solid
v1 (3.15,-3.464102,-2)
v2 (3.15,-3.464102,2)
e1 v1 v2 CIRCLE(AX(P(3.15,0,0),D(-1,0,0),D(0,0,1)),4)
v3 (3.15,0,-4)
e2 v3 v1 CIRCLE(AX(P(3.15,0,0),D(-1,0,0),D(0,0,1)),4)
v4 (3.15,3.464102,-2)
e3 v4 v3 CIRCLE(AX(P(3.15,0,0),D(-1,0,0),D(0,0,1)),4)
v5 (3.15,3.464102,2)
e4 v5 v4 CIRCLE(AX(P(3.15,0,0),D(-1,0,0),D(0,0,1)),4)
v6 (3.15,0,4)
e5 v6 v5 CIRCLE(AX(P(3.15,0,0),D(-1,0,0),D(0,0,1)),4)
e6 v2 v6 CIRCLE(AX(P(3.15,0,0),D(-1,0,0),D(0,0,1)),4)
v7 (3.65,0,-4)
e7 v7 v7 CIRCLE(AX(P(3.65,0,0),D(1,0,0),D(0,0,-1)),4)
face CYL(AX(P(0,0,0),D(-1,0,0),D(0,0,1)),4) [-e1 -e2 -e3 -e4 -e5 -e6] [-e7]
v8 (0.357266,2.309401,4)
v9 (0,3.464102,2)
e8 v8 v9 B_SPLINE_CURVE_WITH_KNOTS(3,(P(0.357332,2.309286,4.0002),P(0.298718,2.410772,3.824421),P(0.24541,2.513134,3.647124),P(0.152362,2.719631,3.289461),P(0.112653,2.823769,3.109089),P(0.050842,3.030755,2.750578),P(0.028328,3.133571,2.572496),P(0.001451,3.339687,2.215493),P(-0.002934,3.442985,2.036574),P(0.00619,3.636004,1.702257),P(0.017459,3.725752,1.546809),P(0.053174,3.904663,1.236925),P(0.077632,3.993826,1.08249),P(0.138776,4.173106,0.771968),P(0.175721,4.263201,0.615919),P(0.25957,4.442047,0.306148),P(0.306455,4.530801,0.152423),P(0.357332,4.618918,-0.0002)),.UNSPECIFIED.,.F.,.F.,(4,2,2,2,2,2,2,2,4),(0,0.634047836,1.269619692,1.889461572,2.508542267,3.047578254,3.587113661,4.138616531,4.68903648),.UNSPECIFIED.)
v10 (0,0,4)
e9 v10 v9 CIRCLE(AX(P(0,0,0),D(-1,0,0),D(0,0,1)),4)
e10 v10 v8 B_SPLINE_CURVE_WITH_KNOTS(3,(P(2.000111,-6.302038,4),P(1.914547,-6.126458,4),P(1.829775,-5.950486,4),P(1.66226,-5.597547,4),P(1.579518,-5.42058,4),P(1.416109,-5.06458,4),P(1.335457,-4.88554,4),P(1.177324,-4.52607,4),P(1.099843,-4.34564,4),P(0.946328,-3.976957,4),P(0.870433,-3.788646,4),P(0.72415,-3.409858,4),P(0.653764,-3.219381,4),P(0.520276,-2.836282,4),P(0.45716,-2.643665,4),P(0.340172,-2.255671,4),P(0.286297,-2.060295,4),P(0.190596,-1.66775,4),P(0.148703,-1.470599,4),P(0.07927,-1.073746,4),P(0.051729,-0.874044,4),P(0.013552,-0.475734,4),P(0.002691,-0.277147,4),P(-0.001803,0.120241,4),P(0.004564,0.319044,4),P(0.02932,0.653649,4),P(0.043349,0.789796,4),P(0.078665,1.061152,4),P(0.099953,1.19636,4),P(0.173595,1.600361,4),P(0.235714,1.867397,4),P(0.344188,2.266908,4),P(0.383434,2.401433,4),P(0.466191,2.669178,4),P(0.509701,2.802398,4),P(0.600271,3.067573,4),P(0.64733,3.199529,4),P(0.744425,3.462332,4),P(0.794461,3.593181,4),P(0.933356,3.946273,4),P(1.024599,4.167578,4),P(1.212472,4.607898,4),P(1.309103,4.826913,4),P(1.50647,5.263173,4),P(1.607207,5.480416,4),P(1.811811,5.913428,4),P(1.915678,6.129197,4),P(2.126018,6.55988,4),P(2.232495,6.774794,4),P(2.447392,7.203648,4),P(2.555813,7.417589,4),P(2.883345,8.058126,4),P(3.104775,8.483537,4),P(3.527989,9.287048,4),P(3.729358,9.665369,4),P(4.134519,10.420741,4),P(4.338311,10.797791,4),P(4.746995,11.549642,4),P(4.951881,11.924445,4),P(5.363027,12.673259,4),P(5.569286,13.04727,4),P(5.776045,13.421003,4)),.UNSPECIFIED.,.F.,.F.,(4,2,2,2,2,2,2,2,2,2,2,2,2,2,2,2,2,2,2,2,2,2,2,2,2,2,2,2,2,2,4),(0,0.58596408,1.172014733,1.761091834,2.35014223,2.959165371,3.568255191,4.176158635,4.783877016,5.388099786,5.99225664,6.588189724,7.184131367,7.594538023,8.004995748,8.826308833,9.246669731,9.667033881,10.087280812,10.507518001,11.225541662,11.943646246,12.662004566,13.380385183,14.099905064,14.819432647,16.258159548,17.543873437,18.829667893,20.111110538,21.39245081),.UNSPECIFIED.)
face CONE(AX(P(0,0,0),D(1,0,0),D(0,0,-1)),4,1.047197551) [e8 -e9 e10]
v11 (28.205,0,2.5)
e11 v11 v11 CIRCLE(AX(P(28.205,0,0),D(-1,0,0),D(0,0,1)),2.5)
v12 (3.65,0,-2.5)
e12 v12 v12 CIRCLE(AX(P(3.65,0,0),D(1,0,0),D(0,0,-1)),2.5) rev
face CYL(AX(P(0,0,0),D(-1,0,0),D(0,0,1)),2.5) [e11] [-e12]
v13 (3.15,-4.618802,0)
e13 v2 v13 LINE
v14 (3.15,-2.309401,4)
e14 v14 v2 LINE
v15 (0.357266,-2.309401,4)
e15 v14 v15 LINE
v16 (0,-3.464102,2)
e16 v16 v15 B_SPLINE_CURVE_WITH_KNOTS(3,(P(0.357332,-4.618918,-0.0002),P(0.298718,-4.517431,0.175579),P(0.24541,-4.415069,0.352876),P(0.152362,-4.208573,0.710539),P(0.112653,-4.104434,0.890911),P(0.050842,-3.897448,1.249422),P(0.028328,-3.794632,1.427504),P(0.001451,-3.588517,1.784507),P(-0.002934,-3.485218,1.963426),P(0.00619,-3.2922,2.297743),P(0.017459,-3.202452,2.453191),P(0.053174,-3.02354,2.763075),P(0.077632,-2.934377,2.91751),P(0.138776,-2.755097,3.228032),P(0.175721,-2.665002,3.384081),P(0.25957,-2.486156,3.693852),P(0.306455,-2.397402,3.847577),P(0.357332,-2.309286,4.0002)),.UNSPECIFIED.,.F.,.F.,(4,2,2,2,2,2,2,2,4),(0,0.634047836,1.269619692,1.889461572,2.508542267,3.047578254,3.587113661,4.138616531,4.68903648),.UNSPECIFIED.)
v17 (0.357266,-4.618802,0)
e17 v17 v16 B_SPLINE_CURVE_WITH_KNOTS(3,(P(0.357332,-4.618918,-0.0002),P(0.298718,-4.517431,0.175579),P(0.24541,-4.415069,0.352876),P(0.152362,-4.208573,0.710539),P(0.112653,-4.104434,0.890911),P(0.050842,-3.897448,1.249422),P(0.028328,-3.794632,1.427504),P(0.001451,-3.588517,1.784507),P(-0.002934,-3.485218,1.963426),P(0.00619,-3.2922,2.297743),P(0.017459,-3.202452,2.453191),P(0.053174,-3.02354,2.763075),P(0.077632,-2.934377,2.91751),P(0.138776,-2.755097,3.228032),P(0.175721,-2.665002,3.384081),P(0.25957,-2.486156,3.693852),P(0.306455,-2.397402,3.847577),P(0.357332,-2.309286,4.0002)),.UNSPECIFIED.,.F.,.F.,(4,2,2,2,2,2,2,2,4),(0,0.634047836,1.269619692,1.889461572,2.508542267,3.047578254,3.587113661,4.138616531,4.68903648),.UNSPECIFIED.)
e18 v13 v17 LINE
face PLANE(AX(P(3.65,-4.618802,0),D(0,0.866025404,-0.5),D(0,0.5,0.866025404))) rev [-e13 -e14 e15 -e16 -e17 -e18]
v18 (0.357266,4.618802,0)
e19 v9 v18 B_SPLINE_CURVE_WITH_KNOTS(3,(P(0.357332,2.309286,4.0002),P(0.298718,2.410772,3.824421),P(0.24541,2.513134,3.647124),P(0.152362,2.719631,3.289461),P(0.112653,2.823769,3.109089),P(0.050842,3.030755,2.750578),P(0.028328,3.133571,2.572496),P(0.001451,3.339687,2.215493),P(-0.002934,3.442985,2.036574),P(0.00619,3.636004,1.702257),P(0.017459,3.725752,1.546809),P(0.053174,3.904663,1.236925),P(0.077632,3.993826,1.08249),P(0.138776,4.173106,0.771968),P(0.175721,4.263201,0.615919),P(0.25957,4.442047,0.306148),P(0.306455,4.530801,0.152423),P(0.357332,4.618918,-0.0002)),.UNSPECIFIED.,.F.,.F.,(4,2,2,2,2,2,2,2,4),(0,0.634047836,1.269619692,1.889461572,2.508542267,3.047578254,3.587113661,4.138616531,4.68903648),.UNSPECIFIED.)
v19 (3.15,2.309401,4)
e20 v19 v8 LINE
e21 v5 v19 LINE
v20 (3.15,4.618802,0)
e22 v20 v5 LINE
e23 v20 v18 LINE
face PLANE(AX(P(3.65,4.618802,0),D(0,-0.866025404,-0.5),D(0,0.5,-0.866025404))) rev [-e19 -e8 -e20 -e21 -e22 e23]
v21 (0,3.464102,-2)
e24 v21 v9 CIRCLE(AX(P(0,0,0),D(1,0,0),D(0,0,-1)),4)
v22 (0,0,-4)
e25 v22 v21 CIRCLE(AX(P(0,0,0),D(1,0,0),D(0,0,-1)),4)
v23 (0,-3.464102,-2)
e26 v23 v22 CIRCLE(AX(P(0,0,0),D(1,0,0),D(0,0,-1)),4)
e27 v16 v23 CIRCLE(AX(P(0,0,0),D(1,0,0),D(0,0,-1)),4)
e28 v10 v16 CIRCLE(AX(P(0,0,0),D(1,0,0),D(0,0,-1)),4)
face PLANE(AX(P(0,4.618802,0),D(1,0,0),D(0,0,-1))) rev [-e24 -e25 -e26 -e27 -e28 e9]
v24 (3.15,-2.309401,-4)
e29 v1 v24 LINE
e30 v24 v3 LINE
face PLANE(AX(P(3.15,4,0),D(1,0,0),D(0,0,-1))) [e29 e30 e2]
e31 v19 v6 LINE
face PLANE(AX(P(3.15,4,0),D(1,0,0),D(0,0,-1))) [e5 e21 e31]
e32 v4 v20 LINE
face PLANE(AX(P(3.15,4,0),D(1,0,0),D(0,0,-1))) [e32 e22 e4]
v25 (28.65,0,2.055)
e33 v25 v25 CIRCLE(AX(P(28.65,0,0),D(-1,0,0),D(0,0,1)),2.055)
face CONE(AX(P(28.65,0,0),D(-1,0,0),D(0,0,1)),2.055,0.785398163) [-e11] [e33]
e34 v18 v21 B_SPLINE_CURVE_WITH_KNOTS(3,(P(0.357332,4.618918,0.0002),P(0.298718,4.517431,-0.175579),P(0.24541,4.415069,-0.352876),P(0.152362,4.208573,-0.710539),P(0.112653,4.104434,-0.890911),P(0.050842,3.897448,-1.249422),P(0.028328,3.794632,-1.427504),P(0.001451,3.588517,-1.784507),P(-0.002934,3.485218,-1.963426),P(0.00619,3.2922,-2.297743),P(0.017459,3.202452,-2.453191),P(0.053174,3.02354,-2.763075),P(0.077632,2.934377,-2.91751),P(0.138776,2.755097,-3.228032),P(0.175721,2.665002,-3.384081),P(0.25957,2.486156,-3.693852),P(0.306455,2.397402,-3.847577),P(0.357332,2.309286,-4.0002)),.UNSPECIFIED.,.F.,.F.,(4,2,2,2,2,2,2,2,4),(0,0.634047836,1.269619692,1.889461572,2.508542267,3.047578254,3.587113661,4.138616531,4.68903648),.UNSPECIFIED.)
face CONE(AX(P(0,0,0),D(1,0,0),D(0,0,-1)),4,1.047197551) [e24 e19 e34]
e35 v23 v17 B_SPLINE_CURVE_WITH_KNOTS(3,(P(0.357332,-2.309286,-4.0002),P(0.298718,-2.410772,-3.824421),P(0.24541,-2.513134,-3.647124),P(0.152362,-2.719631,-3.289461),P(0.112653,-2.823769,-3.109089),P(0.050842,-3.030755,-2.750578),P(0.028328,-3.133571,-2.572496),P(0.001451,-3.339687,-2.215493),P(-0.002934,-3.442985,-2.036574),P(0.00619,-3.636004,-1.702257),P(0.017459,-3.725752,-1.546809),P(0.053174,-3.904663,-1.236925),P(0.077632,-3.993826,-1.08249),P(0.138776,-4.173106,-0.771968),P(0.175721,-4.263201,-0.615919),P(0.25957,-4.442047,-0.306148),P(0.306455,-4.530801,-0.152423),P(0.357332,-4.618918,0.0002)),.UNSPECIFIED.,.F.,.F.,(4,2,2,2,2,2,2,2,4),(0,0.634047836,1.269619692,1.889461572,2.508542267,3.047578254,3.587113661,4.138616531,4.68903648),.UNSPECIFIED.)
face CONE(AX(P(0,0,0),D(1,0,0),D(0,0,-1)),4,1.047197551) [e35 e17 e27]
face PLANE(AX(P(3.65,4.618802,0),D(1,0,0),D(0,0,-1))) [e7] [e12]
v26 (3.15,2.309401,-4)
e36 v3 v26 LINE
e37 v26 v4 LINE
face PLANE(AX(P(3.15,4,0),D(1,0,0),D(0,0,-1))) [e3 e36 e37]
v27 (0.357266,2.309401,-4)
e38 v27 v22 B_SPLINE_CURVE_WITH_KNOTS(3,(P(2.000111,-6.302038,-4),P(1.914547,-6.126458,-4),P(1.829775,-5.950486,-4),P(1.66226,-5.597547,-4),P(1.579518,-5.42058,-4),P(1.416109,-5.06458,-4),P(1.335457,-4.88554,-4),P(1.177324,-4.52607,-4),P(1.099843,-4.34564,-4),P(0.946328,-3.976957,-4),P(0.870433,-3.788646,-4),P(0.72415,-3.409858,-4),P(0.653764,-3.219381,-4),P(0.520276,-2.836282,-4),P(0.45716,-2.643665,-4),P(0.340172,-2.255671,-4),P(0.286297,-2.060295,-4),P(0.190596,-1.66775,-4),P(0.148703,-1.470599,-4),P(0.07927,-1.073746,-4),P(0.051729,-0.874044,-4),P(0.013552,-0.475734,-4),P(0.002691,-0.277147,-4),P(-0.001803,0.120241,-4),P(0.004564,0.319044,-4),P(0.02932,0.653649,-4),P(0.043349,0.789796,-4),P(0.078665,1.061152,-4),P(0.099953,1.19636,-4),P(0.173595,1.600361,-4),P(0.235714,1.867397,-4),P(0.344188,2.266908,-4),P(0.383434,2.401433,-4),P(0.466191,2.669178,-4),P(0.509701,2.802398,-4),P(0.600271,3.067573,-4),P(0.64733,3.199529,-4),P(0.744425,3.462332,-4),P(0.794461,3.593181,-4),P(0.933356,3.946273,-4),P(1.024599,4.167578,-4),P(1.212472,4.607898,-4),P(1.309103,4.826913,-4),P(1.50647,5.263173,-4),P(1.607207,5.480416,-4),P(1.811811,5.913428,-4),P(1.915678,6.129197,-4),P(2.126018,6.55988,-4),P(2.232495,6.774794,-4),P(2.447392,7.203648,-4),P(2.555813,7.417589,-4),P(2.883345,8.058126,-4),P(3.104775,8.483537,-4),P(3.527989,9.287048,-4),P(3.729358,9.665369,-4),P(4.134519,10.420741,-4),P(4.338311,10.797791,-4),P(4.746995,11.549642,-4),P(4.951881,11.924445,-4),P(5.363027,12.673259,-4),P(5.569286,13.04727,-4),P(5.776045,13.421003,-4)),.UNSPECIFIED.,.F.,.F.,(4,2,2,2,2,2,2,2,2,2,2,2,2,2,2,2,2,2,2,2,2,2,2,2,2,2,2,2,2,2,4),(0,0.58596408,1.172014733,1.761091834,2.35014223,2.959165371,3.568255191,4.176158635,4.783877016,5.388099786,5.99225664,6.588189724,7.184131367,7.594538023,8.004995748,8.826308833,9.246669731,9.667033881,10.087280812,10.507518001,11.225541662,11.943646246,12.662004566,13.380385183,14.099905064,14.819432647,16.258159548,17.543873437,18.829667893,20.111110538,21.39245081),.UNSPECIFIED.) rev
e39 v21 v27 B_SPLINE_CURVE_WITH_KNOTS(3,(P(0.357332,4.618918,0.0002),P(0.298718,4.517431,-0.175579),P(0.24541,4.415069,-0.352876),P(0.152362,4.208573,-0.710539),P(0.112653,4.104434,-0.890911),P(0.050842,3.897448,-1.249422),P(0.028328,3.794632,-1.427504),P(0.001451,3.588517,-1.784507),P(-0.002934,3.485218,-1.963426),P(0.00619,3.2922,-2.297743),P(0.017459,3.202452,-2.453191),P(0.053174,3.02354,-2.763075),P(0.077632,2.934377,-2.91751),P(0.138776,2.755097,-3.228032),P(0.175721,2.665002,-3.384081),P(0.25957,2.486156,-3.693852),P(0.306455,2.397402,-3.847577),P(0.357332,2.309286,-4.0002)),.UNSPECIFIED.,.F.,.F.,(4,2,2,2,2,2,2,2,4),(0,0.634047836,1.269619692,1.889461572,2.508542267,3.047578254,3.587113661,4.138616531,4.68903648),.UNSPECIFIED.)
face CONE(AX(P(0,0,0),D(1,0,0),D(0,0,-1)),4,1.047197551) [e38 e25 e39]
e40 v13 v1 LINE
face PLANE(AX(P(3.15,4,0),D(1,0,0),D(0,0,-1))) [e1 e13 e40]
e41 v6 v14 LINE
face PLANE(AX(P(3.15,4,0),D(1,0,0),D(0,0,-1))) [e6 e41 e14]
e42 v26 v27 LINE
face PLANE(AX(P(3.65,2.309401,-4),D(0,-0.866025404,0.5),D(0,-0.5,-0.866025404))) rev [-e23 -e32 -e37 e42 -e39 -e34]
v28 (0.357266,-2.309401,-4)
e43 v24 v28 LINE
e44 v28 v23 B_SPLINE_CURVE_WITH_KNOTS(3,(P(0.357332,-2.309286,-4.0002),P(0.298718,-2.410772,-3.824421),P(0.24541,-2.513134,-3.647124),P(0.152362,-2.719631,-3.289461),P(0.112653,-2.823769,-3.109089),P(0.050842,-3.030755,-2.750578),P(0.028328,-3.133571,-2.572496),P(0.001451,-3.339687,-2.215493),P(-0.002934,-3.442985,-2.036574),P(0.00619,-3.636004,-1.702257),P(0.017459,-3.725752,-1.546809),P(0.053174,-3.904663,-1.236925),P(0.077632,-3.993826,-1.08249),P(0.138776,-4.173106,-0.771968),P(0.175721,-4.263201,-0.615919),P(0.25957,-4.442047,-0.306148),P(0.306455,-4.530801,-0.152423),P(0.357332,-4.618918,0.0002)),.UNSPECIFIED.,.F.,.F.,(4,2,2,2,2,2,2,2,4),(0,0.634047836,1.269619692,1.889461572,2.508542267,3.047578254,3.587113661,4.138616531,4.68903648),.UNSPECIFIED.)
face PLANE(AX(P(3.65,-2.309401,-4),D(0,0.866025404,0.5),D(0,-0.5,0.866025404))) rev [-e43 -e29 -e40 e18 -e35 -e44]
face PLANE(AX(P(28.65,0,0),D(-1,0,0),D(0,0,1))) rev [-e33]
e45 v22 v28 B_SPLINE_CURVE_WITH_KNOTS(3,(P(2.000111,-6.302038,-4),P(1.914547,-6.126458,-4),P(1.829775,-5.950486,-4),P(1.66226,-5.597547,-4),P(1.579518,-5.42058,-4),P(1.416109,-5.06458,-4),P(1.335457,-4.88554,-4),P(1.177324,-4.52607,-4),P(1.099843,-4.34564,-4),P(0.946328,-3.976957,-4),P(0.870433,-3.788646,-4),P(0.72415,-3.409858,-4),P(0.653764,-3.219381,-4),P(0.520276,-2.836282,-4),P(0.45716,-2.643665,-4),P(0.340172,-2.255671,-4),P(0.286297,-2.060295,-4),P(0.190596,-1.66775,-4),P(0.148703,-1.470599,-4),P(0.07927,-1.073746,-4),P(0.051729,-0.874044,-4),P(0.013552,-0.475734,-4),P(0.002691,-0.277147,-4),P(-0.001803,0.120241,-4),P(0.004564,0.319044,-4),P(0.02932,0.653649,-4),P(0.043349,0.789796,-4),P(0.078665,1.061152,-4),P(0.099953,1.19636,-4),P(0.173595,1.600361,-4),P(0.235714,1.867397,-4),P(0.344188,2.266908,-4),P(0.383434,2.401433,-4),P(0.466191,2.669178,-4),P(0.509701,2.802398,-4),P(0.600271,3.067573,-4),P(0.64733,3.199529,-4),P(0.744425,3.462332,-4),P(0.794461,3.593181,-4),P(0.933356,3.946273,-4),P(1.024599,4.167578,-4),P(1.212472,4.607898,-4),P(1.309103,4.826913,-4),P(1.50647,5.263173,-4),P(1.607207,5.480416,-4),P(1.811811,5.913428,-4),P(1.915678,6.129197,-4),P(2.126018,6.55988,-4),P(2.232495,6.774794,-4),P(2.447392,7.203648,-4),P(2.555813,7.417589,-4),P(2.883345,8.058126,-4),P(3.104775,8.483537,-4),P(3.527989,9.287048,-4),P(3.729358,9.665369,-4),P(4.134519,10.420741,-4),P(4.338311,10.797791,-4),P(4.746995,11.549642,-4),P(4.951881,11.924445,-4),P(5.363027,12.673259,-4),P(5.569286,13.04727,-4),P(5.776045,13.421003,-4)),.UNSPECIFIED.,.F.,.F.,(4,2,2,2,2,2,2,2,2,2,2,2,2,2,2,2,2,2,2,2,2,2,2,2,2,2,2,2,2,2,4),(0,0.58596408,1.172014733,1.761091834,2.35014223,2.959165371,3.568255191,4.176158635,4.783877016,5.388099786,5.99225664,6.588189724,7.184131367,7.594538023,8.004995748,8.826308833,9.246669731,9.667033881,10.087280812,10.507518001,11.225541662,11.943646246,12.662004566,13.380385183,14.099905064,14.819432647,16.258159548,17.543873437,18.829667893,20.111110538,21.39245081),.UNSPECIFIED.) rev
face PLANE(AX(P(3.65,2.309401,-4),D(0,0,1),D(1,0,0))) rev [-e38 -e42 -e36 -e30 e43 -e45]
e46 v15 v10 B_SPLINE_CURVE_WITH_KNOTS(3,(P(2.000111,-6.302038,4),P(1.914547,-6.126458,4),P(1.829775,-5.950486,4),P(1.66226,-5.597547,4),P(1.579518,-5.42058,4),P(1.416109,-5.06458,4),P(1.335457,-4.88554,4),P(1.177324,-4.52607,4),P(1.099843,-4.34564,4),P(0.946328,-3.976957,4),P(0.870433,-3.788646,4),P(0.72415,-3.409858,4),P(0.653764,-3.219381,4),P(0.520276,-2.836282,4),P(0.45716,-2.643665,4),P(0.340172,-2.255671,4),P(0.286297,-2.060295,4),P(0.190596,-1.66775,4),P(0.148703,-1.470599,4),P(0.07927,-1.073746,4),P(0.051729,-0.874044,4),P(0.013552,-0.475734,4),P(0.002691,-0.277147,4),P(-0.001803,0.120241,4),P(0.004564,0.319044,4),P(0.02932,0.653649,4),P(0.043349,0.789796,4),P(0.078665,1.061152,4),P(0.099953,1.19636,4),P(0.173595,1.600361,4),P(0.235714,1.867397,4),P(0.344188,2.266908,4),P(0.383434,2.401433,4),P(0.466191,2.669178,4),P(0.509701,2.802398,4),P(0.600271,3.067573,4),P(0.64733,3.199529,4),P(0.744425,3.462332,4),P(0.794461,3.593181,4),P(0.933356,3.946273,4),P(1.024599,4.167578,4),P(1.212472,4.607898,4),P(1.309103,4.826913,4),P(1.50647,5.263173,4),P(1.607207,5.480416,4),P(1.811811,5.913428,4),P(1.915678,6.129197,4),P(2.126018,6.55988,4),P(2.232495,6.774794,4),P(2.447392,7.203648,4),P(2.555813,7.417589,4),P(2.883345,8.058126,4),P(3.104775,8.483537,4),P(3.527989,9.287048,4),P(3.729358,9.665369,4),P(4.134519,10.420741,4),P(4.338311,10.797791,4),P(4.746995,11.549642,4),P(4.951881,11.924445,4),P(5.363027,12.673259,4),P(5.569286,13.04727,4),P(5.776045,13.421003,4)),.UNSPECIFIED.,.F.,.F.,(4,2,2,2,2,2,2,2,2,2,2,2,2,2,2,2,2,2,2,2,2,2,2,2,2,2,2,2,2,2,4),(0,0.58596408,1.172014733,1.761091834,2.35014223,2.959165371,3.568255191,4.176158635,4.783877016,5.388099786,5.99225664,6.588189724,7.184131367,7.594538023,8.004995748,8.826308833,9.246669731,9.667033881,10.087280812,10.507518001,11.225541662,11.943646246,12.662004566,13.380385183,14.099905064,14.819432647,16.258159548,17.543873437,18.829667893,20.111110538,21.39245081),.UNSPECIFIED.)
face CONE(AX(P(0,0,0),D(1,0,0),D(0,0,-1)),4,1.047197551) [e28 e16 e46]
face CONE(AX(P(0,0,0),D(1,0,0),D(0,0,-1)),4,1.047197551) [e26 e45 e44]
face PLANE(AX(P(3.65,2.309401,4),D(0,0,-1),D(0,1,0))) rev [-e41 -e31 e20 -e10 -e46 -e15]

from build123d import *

# Parameters (mm, degrees)
BASEHEAD_DEPTH = 3.65
SKETCH4_W      = 0.5
SKETCH4_H      = 10.618802154


# Read off the part's stored shape, not the designer's step: HeadChamfer
with BuildPart() as part:
    # Sketch1 → BaseHead (new body)
    with BuildSketch(Plane(origin=(0, 0, 0), x_dir=(0, 0, -1), z_dir=(1, 0, 0))):
        Polygon((4, 2.309401077), (4, -2.309401077), (0, -4.618802154), (-4, -2.309401077), (-4, 2.309401077), (0, 4.618802154), align=None)
    extrude(amount=BASEHEAD_DEPTH)

    # HeadChamfer outline → HeadChamfer (revolve, cut)
    with BuildSketch(Plane.YX):
        Polygon((4.618802148, 0.357265587), (3.999999382, -3.57e-07), (4.618802154, -3.57e-07), align=None)
    revolve(axis=Axis((0, 0, 0), (1, 0, 0)), mode=Mode.SUBTRACT)

    # HeadChamfer 2 outline → HeadChamfer 2 (revolve)
    with BuildSketch(Plane.YX):
        Polygon((2.5, 3.65), (2.5, 28.205), (2.055, 28.65), (0, 28.65), (0, 3.65), align=None)
    revolve(axis=Axis((0, 0, 0), (1, 0, 0)))

    # Sketch4 → BearingFace (revolve, cut)
    with BuildSketch(Plane.XY, mode=Mode.PRIVATE) as bearingface_sk:
        with Locations((3.4, 9.309401077)):
            Rectangle(SKETCH4_W, SKETCH4_H)
    revolve(bearingface_sk.sketch.rotate(Axis((0, 0, 0), (1, 0, 0)), 90), axis=Axis((0, 0, 0), (1, 0, 0)), mode=Mode.SUBTRACT)


solid = part.part
